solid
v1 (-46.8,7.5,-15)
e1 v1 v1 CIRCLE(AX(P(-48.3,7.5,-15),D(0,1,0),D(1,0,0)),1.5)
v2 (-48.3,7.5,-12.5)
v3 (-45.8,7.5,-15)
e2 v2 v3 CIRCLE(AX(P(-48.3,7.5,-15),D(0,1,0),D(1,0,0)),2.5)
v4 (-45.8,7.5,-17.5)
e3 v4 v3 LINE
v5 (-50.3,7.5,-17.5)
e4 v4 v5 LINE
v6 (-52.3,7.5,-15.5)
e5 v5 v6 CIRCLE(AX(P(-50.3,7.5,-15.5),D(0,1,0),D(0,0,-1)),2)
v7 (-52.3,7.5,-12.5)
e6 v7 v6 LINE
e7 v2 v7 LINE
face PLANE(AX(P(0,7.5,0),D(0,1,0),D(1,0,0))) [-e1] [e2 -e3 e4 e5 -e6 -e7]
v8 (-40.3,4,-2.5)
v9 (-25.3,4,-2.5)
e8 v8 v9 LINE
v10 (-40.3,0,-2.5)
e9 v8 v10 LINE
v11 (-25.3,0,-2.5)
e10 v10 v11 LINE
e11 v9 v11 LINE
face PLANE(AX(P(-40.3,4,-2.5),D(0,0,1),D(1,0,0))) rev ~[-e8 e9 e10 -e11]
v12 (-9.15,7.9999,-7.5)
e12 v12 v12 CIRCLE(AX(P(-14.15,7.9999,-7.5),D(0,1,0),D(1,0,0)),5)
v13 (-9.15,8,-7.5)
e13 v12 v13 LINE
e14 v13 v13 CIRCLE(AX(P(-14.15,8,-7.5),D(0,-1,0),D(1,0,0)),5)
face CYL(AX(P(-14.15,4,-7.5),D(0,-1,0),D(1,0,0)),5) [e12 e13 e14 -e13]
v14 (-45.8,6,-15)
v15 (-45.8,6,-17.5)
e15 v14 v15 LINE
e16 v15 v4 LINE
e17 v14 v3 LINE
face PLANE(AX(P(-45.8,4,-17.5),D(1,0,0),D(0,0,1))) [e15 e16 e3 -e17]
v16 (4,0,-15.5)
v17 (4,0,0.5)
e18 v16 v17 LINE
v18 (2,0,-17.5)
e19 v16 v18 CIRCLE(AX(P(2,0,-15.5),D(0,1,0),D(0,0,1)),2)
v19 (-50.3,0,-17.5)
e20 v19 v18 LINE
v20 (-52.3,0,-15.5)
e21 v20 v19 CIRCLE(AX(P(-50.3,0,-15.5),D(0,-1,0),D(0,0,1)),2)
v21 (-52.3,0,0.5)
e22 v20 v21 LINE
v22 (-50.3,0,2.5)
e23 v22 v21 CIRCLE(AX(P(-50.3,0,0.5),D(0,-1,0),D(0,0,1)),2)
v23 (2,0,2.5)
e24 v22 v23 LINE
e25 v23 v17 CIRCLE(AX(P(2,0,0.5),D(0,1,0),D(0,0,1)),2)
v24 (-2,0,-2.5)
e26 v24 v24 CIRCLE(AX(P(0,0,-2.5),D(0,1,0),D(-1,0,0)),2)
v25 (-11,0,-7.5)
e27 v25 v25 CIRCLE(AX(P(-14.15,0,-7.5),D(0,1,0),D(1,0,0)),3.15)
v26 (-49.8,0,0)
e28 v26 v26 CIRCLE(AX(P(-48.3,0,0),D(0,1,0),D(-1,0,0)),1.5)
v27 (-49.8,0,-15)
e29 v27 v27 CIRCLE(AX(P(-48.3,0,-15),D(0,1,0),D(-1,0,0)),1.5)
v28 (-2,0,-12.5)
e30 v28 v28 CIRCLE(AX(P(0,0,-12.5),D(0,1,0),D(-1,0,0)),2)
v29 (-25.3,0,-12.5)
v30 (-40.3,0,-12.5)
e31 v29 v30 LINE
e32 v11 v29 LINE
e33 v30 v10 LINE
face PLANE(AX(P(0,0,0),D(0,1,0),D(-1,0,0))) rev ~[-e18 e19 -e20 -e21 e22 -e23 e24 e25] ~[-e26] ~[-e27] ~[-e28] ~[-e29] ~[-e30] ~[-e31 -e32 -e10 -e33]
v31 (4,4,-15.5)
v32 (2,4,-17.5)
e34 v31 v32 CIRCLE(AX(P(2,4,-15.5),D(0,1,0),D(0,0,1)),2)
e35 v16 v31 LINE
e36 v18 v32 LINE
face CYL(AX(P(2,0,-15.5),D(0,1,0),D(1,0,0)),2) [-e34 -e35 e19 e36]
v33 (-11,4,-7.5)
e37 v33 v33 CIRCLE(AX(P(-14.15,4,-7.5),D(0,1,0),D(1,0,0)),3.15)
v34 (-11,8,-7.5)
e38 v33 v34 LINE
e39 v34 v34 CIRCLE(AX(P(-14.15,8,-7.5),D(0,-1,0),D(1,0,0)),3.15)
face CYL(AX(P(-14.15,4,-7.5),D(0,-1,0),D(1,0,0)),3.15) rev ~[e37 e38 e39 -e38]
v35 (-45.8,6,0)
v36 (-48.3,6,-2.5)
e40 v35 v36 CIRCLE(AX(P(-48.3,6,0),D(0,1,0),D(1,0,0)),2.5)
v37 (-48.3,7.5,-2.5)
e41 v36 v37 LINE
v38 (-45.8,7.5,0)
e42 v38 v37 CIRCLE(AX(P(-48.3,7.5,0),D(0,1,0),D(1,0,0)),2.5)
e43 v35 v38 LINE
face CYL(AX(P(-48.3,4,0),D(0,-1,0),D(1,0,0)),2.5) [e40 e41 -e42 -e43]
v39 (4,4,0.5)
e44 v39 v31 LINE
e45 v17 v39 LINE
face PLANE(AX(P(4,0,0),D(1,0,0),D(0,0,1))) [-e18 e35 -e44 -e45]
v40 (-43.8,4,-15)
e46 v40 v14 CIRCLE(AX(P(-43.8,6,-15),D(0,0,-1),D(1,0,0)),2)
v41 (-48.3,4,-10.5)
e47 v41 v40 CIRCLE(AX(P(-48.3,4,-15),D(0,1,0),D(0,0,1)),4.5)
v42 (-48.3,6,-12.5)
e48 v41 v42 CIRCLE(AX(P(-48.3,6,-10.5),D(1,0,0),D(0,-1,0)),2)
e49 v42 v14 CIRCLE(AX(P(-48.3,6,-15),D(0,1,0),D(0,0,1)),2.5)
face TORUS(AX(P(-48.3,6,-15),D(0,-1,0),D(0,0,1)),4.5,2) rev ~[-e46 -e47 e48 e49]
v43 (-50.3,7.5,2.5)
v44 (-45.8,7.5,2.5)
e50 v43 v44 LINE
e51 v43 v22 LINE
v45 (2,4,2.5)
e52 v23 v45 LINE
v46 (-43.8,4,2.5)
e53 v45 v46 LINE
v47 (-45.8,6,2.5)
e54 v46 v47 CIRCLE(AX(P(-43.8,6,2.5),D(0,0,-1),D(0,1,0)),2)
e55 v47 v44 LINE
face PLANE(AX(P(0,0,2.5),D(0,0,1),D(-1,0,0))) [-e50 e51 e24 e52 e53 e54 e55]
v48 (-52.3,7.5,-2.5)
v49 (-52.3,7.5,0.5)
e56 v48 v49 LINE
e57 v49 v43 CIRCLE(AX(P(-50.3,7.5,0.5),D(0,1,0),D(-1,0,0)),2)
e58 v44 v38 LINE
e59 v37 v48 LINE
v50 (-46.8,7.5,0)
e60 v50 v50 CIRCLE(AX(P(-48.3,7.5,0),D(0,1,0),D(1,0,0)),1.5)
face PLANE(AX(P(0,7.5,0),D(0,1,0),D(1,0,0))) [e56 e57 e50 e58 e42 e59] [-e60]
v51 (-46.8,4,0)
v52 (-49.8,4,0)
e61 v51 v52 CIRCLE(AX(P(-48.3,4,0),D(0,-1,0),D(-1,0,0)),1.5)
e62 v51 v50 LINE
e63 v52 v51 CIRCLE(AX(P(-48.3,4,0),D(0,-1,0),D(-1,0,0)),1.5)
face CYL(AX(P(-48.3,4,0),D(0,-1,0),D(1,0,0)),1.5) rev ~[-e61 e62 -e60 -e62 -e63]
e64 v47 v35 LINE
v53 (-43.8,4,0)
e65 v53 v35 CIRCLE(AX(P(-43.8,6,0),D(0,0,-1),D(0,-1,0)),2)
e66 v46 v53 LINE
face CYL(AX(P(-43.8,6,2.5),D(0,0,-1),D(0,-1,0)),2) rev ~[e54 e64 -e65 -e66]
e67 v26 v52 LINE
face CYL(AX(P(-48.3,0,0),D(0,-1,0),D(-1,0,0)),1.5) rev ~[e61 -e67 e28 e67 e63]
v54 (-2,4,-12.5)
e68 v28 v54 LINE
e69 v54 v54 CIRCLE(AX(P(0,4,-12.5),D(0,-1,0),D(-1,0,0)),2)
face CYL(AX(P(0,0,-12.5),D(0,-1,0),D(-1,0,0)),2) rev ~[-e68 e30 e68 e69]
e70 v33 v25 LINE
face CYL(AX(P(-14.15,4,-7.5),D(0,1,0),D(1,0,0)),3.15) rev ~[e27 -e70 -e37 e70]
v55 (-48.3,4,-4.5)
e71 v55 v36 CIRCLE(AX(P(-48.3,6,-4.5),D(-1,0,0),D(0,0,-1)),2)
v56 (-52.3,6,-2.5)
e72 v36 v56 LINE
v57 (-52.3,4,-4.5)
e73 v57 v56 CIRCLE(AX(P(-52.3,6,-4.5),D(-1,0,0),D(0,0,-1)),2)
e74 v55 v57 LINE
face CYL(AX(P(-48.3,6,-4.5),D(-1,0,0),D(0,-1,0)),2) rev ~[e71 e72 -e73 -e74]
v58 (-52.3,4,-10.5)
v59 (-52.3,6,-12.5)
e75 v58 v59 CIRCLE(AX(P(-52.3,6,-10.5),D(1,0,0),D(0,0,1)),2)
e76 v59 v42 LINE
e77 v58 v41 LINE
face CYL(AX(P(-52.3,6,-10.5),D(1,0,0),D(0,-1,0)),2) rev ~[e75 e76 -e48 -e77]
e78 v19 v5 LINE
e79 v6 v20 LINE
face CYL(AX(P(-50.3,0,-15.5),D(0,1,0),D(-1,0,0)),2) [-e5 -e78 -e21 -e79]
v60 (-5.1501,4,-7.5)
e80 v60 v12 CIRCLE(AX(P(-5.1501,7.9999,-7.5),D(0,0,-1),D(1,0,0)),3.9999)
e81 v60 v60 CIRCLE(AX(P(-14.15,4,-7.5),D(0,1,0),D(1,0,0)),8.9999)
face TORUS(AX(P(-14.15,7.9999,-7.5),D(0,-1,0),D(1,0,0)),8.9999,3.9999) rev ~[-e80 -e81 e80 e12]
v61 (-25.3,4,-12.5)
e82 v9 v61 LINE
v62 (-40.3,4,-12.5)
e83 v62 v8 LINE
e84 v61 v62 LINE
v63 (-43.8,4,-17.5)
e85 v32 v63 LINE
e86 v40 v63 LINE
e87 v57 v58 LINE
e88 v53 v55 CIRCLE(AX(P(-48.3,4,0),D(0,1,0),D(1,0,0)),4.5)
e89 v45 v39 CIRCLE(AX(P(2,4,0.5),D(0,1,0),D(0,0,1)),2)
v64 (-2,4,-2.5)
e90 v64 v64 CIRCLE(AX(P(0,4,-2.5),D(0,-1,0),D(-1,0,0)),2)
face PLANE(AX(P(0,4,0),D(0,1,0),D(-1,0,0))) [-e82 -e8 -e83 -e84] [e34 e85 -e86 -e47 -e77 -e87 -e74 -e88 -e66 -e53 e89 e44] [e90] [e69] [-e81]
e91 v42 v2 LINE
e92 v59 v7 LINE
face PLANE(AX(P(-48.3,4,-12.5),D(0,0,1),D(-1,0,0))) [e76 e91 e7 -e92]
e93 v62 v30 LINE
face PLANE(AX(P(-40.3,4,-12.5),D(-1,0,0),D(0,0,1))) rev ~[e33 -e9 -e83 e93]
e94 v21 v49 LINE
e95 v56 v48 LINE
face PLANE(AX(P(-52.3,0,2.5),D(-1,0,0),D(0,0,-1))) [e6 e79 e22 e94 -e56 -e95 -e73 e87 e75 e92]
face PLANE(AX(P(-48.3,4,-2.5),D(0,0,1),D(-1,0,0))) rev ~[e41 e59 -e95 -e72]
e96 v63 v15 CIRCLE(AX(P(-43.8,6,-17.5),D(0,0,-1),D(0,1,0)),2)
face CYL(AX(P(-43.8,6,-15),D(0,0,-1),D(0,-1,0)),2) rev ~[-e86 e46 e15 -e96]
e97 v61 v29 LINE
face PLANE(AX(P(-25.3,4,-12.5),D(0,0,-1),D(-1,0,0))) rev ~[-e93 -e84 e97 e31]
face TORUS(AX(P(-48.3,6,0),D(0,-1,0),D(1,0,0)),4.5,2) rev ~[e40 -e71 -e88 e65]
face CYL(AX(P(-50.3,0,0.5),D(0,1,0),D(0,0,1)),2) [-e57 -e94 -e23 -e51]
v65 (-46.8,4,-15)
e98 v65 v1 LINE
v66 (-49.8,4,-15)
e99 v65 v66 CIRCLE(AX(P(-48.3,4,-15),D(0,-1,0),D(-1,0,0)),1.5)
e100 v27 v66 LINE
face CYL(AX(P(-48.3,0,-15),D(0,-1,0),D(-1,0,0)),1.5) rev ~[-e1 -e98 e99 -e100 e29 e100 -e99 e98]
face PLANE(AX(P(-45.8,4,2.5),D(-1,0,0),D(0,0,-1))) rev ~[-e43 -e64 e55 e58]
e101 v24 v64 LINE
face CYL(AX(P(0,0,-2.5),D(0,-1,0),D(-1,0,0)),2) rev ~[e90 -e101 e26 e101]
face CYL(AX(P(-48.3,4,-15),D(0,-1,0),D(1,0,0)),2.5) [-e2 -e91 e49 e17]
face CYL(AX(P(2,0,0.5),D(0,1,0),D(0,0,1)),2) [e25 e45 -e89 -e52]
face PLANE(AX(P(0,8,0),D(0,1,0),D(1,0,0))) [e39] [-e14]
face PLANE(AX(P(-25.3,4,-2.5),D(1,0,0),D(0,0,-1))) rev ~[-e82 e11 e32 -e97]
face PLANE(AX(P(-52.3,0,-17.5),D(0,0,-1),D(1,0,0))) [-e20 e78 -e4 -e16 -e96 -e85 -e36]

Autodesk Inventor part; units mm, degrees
ref_plane "YZ Plane" through (0, 0, 0) normal (1, 0, 0) x (0, 1, 0)
ref_plane "XZ Plane" through (0, 0, 0) normal (0, 1, 0) x (-1, 0, 0)
ref_plane "XY Plane" through (0, 0, 0) normal (0, 0, 1) x (1, 0, 0)
sketch "Sketch1" plane through (0, 0, 0) normal (0, 1, 0) x (-1, 0, 0)
  line L0 (0, 0) -> (48.3, 0)
  line L1 (48.3, 0) -> (48.3, -15)
  line L2 (48.3, -15) -> (0, -15)
  line L3 (0, -15) -> (0, 0)
  circle A0 centre (48.3, 0) radius 1.5
  circle A1 centre (48.3, -15) radius 1.5
  line L4 (48.3, -15) -> (52.3, -15)
  line L5 (52.3, -15) -> (52.3, -17.5)
  line L6 (52.3, -17.5) -> (48.3, -17.5)
  line L7 (48.3, -17.5) -> (48.3, -15)
  line L8 (0, 0) -> (-4, 0)
  line L9 (-4, 0) -> (-4, 2.5)
  line L10 (-4, 2.5) -> (0, 2.5)
  line L11 (0, 2.5) -> (0, 0)
  line L12 (-4, 2.5) -> (52.3, 2.5)
  line L13 (52.3, 2.5) -> (52.3, -17.5)
  line L14 (52.3, -17.5) -> (-4, -17.5)
  line L15 (-4, -17.5) -> (-4, 2.5)
  line L16 (0, -2.5) -> (0, -12.5)
  circle A2 centre (0, -12.5) radius 2
  circle A3 centre (0, -2.5) radius 2
  point P0 (0, -7.5)
  dimension "d0" = 48.3
  dimension "d1" = 15
  dimension "d2" = 3
  dimension "d3" = 3
  dimension "d6" = 4
  dimension "d7" = 2.5
  dimension "d8" = 4
  dimension "d9" = 2.5
  dimension "d33" = 10
  dimension "d34" = 4
  dimension "d35" = 4
extrude "Extrusion1" add sketch "Sketch1" along normal blind 4 contours L11 L12 L13 L4 A1 L1 A0 L0 | L0 A0 L1 A1 L2 L3 A2 A3 | L3 A3 A2 L2 A1 L7 L14 L15 L8 | L8 L9 L10 L11 | L7 A1 L4 L5 L6
sketch "Sketch2" plane through (0, 4, 0) normal (0, 1, 0) x (1, 0, 0)
  line L0 (4, -2.5) -> (4, 17.5) projected
  line L1 (4, -2.5) -> (-14.15, -2.5)
  line L2 (-14.15, -2.5) -> (-14.15, 7.5)
  line L3 (-14.15, 7.5) -> (4, 7.5)
  line L4 (4, 7.5) -> (4, -2.5)
  circle A0 centre (-14.15, 7.5) radius 5
  circle A1 centre (-14.15, 7.5) radius 3.15
  point P0 (0, 0)
  dimension "d12" = 18.15
  dimension "d13" = 10
  dimension "d14" = 10
  dimension "d19" = 6.3
extrude "Extrusion2" add sketch "Sketch2" along normal blind 4 and the other way blind 2.5 contours A0 L2 A1 L3 | L3 A1 L2 A0
extrude "Extrusion3" cut sketch "Sketch2" against normal blind 4 contours A1 L2 L3 | L3 L2 A1
fillet "Fillet2" radius 4 1 edges at (-19.15, 4, -7.5)
sketch "Sketch3" plane through (0, 4, 0) normal (0, 1, 0) x (1, 0, 0)
  line L0 (4, 17.5) -> (-52.3, 17.5) projected
  line L1 (-52.3, 17.5) -> (-40.3, 17.5)
  line L2 (-40.3, 17.5) -> (-40.3, 12.5)
  line L3 (-40.3, 12.5) -> (-52.3, 12.5)
  line L4 (-52.3, 12.5) -> (-52.3, 17.5)
  line L5 (-52.3, -2.5) -> (4, -2.5) projected
  line L6 (-52.3, -2.5) -> (-40.3, -2.5)
  line L7 (-40.3, -2.5) -> (-40.3, 2.5)
  line L8 (-40.3, 2.5) -> (-52.3, 2.5)
  line L9 (-52.3, 2.5) -> (-52.3, -2.5)
  line L10 (-40.3, 2.5) -> (-25.3, 2.5)
  line L11 (-25.3, 2.5) -> (-25.3, 12.5)
  line L12 (-25.3, 12.5) -> (-40.3, 12.5)
  line L13 (-40.3, 12.5) -> (-40.3, 2.5)
  point P0 (0, 0)
  dimension "d25" = 12
  dimension "d26" = 5
  dimension "d27" = 12
  dimension "d28" = 5
  dimension "d29" = 15
extrude "Extrusion4" cut sketch "Sketch3" against normal blind 4 contours L12 L11 L10 L13
fillet "Fillet3" radius 2 4 edges at (-52.3, 2, 2.5) (4, 2, 2.5) (4, 2, -17.5) (-52.3, 2, -17.5)
sketch "Sketch4" plane through (0, 4, 0) normal (0, 1, 0) x (1, 0, 0)
  circle A0 centre (-48.3, 0) radius 1.5 projected
  circle A1 centre (-48.3, 0) radius 1.5
  circle A2 centre (-48.3, 0) radius 2.5
  line L0 (-50.3, -2.5) -> (2, -2.5) projected
  circle A3 centre (-48.3, 15) radius 1.5 projected
  circle A4 centre (-48.3, 15) radius 1.5
  circle A5 centre (-48.3, 15) radius 2.5
  line L1 (2, 17.5) -> (-50.3, 17.5) projected
  line L2 (-45.8, 12.5) -> (-52.3, 12.5)
  line L3 (-52.3, 12.5) -> (-52.3, 17.5)
  line L4 (-52.3, 17.5) -> (-45.8, 17.5)
  line L5 (-45.8, 17.5) -> (-45.8, 12.5)
  line L6 (-52.3, -2.5) -> (-45.8, -2.5)
  line L7 (-45.8, -2.5) -> (-45.8, 2.5)
  line L8 (-45.8, 2.5) -> (-52.3, 2.5)
  line L9 (-52.3, 2.5) -> (-52.3, -2.5)
  arc A6 (-52.3, -0.5) -> (-50.3, -2.5) centre (-50.3, -0.5) ccw projected
  circle A7 centre (-50.3, -0.5) radius 2
  arc A8 (-50.3, 17.5) -> (-52.3, 15.5) centre (-50.3, 15.5) ccw projected
  circle A9 centre (-50.3, 15.5) radius 2
  point P0 (0, 0)
  point P1 (-48.3, 12.5)
  point P2 (-45.8, 15)
  point P3 (-45.8, 0)
  point P4 (-48.3, 2.5)
extrude "Extrusion5" add sketch "Sketch4" along normal blind 3.5 contours A0 A7 A2 | A0 A7 A2 | A7 L9 L8 A2 | A2 A7 A6 | A2 L0 A7 | A2 L7 L0 | A3 A9 A5 | A3 A9 A5 | A9 L1 A5 | A5 A9 A8 | A5 L2 L3 A9 | L1 L5 A5
fillet "Fillet4" radius 2 6 edges at (-46.5322, 4, -13.2322) (-45.8, 4, -16.25) (-50.3, 4, -12.5) (-45.8, 4, 1.25) (-50.3, 4, -2.5) (-46.5322, 4, -1.7678)
properties part number "back_servo_support"
